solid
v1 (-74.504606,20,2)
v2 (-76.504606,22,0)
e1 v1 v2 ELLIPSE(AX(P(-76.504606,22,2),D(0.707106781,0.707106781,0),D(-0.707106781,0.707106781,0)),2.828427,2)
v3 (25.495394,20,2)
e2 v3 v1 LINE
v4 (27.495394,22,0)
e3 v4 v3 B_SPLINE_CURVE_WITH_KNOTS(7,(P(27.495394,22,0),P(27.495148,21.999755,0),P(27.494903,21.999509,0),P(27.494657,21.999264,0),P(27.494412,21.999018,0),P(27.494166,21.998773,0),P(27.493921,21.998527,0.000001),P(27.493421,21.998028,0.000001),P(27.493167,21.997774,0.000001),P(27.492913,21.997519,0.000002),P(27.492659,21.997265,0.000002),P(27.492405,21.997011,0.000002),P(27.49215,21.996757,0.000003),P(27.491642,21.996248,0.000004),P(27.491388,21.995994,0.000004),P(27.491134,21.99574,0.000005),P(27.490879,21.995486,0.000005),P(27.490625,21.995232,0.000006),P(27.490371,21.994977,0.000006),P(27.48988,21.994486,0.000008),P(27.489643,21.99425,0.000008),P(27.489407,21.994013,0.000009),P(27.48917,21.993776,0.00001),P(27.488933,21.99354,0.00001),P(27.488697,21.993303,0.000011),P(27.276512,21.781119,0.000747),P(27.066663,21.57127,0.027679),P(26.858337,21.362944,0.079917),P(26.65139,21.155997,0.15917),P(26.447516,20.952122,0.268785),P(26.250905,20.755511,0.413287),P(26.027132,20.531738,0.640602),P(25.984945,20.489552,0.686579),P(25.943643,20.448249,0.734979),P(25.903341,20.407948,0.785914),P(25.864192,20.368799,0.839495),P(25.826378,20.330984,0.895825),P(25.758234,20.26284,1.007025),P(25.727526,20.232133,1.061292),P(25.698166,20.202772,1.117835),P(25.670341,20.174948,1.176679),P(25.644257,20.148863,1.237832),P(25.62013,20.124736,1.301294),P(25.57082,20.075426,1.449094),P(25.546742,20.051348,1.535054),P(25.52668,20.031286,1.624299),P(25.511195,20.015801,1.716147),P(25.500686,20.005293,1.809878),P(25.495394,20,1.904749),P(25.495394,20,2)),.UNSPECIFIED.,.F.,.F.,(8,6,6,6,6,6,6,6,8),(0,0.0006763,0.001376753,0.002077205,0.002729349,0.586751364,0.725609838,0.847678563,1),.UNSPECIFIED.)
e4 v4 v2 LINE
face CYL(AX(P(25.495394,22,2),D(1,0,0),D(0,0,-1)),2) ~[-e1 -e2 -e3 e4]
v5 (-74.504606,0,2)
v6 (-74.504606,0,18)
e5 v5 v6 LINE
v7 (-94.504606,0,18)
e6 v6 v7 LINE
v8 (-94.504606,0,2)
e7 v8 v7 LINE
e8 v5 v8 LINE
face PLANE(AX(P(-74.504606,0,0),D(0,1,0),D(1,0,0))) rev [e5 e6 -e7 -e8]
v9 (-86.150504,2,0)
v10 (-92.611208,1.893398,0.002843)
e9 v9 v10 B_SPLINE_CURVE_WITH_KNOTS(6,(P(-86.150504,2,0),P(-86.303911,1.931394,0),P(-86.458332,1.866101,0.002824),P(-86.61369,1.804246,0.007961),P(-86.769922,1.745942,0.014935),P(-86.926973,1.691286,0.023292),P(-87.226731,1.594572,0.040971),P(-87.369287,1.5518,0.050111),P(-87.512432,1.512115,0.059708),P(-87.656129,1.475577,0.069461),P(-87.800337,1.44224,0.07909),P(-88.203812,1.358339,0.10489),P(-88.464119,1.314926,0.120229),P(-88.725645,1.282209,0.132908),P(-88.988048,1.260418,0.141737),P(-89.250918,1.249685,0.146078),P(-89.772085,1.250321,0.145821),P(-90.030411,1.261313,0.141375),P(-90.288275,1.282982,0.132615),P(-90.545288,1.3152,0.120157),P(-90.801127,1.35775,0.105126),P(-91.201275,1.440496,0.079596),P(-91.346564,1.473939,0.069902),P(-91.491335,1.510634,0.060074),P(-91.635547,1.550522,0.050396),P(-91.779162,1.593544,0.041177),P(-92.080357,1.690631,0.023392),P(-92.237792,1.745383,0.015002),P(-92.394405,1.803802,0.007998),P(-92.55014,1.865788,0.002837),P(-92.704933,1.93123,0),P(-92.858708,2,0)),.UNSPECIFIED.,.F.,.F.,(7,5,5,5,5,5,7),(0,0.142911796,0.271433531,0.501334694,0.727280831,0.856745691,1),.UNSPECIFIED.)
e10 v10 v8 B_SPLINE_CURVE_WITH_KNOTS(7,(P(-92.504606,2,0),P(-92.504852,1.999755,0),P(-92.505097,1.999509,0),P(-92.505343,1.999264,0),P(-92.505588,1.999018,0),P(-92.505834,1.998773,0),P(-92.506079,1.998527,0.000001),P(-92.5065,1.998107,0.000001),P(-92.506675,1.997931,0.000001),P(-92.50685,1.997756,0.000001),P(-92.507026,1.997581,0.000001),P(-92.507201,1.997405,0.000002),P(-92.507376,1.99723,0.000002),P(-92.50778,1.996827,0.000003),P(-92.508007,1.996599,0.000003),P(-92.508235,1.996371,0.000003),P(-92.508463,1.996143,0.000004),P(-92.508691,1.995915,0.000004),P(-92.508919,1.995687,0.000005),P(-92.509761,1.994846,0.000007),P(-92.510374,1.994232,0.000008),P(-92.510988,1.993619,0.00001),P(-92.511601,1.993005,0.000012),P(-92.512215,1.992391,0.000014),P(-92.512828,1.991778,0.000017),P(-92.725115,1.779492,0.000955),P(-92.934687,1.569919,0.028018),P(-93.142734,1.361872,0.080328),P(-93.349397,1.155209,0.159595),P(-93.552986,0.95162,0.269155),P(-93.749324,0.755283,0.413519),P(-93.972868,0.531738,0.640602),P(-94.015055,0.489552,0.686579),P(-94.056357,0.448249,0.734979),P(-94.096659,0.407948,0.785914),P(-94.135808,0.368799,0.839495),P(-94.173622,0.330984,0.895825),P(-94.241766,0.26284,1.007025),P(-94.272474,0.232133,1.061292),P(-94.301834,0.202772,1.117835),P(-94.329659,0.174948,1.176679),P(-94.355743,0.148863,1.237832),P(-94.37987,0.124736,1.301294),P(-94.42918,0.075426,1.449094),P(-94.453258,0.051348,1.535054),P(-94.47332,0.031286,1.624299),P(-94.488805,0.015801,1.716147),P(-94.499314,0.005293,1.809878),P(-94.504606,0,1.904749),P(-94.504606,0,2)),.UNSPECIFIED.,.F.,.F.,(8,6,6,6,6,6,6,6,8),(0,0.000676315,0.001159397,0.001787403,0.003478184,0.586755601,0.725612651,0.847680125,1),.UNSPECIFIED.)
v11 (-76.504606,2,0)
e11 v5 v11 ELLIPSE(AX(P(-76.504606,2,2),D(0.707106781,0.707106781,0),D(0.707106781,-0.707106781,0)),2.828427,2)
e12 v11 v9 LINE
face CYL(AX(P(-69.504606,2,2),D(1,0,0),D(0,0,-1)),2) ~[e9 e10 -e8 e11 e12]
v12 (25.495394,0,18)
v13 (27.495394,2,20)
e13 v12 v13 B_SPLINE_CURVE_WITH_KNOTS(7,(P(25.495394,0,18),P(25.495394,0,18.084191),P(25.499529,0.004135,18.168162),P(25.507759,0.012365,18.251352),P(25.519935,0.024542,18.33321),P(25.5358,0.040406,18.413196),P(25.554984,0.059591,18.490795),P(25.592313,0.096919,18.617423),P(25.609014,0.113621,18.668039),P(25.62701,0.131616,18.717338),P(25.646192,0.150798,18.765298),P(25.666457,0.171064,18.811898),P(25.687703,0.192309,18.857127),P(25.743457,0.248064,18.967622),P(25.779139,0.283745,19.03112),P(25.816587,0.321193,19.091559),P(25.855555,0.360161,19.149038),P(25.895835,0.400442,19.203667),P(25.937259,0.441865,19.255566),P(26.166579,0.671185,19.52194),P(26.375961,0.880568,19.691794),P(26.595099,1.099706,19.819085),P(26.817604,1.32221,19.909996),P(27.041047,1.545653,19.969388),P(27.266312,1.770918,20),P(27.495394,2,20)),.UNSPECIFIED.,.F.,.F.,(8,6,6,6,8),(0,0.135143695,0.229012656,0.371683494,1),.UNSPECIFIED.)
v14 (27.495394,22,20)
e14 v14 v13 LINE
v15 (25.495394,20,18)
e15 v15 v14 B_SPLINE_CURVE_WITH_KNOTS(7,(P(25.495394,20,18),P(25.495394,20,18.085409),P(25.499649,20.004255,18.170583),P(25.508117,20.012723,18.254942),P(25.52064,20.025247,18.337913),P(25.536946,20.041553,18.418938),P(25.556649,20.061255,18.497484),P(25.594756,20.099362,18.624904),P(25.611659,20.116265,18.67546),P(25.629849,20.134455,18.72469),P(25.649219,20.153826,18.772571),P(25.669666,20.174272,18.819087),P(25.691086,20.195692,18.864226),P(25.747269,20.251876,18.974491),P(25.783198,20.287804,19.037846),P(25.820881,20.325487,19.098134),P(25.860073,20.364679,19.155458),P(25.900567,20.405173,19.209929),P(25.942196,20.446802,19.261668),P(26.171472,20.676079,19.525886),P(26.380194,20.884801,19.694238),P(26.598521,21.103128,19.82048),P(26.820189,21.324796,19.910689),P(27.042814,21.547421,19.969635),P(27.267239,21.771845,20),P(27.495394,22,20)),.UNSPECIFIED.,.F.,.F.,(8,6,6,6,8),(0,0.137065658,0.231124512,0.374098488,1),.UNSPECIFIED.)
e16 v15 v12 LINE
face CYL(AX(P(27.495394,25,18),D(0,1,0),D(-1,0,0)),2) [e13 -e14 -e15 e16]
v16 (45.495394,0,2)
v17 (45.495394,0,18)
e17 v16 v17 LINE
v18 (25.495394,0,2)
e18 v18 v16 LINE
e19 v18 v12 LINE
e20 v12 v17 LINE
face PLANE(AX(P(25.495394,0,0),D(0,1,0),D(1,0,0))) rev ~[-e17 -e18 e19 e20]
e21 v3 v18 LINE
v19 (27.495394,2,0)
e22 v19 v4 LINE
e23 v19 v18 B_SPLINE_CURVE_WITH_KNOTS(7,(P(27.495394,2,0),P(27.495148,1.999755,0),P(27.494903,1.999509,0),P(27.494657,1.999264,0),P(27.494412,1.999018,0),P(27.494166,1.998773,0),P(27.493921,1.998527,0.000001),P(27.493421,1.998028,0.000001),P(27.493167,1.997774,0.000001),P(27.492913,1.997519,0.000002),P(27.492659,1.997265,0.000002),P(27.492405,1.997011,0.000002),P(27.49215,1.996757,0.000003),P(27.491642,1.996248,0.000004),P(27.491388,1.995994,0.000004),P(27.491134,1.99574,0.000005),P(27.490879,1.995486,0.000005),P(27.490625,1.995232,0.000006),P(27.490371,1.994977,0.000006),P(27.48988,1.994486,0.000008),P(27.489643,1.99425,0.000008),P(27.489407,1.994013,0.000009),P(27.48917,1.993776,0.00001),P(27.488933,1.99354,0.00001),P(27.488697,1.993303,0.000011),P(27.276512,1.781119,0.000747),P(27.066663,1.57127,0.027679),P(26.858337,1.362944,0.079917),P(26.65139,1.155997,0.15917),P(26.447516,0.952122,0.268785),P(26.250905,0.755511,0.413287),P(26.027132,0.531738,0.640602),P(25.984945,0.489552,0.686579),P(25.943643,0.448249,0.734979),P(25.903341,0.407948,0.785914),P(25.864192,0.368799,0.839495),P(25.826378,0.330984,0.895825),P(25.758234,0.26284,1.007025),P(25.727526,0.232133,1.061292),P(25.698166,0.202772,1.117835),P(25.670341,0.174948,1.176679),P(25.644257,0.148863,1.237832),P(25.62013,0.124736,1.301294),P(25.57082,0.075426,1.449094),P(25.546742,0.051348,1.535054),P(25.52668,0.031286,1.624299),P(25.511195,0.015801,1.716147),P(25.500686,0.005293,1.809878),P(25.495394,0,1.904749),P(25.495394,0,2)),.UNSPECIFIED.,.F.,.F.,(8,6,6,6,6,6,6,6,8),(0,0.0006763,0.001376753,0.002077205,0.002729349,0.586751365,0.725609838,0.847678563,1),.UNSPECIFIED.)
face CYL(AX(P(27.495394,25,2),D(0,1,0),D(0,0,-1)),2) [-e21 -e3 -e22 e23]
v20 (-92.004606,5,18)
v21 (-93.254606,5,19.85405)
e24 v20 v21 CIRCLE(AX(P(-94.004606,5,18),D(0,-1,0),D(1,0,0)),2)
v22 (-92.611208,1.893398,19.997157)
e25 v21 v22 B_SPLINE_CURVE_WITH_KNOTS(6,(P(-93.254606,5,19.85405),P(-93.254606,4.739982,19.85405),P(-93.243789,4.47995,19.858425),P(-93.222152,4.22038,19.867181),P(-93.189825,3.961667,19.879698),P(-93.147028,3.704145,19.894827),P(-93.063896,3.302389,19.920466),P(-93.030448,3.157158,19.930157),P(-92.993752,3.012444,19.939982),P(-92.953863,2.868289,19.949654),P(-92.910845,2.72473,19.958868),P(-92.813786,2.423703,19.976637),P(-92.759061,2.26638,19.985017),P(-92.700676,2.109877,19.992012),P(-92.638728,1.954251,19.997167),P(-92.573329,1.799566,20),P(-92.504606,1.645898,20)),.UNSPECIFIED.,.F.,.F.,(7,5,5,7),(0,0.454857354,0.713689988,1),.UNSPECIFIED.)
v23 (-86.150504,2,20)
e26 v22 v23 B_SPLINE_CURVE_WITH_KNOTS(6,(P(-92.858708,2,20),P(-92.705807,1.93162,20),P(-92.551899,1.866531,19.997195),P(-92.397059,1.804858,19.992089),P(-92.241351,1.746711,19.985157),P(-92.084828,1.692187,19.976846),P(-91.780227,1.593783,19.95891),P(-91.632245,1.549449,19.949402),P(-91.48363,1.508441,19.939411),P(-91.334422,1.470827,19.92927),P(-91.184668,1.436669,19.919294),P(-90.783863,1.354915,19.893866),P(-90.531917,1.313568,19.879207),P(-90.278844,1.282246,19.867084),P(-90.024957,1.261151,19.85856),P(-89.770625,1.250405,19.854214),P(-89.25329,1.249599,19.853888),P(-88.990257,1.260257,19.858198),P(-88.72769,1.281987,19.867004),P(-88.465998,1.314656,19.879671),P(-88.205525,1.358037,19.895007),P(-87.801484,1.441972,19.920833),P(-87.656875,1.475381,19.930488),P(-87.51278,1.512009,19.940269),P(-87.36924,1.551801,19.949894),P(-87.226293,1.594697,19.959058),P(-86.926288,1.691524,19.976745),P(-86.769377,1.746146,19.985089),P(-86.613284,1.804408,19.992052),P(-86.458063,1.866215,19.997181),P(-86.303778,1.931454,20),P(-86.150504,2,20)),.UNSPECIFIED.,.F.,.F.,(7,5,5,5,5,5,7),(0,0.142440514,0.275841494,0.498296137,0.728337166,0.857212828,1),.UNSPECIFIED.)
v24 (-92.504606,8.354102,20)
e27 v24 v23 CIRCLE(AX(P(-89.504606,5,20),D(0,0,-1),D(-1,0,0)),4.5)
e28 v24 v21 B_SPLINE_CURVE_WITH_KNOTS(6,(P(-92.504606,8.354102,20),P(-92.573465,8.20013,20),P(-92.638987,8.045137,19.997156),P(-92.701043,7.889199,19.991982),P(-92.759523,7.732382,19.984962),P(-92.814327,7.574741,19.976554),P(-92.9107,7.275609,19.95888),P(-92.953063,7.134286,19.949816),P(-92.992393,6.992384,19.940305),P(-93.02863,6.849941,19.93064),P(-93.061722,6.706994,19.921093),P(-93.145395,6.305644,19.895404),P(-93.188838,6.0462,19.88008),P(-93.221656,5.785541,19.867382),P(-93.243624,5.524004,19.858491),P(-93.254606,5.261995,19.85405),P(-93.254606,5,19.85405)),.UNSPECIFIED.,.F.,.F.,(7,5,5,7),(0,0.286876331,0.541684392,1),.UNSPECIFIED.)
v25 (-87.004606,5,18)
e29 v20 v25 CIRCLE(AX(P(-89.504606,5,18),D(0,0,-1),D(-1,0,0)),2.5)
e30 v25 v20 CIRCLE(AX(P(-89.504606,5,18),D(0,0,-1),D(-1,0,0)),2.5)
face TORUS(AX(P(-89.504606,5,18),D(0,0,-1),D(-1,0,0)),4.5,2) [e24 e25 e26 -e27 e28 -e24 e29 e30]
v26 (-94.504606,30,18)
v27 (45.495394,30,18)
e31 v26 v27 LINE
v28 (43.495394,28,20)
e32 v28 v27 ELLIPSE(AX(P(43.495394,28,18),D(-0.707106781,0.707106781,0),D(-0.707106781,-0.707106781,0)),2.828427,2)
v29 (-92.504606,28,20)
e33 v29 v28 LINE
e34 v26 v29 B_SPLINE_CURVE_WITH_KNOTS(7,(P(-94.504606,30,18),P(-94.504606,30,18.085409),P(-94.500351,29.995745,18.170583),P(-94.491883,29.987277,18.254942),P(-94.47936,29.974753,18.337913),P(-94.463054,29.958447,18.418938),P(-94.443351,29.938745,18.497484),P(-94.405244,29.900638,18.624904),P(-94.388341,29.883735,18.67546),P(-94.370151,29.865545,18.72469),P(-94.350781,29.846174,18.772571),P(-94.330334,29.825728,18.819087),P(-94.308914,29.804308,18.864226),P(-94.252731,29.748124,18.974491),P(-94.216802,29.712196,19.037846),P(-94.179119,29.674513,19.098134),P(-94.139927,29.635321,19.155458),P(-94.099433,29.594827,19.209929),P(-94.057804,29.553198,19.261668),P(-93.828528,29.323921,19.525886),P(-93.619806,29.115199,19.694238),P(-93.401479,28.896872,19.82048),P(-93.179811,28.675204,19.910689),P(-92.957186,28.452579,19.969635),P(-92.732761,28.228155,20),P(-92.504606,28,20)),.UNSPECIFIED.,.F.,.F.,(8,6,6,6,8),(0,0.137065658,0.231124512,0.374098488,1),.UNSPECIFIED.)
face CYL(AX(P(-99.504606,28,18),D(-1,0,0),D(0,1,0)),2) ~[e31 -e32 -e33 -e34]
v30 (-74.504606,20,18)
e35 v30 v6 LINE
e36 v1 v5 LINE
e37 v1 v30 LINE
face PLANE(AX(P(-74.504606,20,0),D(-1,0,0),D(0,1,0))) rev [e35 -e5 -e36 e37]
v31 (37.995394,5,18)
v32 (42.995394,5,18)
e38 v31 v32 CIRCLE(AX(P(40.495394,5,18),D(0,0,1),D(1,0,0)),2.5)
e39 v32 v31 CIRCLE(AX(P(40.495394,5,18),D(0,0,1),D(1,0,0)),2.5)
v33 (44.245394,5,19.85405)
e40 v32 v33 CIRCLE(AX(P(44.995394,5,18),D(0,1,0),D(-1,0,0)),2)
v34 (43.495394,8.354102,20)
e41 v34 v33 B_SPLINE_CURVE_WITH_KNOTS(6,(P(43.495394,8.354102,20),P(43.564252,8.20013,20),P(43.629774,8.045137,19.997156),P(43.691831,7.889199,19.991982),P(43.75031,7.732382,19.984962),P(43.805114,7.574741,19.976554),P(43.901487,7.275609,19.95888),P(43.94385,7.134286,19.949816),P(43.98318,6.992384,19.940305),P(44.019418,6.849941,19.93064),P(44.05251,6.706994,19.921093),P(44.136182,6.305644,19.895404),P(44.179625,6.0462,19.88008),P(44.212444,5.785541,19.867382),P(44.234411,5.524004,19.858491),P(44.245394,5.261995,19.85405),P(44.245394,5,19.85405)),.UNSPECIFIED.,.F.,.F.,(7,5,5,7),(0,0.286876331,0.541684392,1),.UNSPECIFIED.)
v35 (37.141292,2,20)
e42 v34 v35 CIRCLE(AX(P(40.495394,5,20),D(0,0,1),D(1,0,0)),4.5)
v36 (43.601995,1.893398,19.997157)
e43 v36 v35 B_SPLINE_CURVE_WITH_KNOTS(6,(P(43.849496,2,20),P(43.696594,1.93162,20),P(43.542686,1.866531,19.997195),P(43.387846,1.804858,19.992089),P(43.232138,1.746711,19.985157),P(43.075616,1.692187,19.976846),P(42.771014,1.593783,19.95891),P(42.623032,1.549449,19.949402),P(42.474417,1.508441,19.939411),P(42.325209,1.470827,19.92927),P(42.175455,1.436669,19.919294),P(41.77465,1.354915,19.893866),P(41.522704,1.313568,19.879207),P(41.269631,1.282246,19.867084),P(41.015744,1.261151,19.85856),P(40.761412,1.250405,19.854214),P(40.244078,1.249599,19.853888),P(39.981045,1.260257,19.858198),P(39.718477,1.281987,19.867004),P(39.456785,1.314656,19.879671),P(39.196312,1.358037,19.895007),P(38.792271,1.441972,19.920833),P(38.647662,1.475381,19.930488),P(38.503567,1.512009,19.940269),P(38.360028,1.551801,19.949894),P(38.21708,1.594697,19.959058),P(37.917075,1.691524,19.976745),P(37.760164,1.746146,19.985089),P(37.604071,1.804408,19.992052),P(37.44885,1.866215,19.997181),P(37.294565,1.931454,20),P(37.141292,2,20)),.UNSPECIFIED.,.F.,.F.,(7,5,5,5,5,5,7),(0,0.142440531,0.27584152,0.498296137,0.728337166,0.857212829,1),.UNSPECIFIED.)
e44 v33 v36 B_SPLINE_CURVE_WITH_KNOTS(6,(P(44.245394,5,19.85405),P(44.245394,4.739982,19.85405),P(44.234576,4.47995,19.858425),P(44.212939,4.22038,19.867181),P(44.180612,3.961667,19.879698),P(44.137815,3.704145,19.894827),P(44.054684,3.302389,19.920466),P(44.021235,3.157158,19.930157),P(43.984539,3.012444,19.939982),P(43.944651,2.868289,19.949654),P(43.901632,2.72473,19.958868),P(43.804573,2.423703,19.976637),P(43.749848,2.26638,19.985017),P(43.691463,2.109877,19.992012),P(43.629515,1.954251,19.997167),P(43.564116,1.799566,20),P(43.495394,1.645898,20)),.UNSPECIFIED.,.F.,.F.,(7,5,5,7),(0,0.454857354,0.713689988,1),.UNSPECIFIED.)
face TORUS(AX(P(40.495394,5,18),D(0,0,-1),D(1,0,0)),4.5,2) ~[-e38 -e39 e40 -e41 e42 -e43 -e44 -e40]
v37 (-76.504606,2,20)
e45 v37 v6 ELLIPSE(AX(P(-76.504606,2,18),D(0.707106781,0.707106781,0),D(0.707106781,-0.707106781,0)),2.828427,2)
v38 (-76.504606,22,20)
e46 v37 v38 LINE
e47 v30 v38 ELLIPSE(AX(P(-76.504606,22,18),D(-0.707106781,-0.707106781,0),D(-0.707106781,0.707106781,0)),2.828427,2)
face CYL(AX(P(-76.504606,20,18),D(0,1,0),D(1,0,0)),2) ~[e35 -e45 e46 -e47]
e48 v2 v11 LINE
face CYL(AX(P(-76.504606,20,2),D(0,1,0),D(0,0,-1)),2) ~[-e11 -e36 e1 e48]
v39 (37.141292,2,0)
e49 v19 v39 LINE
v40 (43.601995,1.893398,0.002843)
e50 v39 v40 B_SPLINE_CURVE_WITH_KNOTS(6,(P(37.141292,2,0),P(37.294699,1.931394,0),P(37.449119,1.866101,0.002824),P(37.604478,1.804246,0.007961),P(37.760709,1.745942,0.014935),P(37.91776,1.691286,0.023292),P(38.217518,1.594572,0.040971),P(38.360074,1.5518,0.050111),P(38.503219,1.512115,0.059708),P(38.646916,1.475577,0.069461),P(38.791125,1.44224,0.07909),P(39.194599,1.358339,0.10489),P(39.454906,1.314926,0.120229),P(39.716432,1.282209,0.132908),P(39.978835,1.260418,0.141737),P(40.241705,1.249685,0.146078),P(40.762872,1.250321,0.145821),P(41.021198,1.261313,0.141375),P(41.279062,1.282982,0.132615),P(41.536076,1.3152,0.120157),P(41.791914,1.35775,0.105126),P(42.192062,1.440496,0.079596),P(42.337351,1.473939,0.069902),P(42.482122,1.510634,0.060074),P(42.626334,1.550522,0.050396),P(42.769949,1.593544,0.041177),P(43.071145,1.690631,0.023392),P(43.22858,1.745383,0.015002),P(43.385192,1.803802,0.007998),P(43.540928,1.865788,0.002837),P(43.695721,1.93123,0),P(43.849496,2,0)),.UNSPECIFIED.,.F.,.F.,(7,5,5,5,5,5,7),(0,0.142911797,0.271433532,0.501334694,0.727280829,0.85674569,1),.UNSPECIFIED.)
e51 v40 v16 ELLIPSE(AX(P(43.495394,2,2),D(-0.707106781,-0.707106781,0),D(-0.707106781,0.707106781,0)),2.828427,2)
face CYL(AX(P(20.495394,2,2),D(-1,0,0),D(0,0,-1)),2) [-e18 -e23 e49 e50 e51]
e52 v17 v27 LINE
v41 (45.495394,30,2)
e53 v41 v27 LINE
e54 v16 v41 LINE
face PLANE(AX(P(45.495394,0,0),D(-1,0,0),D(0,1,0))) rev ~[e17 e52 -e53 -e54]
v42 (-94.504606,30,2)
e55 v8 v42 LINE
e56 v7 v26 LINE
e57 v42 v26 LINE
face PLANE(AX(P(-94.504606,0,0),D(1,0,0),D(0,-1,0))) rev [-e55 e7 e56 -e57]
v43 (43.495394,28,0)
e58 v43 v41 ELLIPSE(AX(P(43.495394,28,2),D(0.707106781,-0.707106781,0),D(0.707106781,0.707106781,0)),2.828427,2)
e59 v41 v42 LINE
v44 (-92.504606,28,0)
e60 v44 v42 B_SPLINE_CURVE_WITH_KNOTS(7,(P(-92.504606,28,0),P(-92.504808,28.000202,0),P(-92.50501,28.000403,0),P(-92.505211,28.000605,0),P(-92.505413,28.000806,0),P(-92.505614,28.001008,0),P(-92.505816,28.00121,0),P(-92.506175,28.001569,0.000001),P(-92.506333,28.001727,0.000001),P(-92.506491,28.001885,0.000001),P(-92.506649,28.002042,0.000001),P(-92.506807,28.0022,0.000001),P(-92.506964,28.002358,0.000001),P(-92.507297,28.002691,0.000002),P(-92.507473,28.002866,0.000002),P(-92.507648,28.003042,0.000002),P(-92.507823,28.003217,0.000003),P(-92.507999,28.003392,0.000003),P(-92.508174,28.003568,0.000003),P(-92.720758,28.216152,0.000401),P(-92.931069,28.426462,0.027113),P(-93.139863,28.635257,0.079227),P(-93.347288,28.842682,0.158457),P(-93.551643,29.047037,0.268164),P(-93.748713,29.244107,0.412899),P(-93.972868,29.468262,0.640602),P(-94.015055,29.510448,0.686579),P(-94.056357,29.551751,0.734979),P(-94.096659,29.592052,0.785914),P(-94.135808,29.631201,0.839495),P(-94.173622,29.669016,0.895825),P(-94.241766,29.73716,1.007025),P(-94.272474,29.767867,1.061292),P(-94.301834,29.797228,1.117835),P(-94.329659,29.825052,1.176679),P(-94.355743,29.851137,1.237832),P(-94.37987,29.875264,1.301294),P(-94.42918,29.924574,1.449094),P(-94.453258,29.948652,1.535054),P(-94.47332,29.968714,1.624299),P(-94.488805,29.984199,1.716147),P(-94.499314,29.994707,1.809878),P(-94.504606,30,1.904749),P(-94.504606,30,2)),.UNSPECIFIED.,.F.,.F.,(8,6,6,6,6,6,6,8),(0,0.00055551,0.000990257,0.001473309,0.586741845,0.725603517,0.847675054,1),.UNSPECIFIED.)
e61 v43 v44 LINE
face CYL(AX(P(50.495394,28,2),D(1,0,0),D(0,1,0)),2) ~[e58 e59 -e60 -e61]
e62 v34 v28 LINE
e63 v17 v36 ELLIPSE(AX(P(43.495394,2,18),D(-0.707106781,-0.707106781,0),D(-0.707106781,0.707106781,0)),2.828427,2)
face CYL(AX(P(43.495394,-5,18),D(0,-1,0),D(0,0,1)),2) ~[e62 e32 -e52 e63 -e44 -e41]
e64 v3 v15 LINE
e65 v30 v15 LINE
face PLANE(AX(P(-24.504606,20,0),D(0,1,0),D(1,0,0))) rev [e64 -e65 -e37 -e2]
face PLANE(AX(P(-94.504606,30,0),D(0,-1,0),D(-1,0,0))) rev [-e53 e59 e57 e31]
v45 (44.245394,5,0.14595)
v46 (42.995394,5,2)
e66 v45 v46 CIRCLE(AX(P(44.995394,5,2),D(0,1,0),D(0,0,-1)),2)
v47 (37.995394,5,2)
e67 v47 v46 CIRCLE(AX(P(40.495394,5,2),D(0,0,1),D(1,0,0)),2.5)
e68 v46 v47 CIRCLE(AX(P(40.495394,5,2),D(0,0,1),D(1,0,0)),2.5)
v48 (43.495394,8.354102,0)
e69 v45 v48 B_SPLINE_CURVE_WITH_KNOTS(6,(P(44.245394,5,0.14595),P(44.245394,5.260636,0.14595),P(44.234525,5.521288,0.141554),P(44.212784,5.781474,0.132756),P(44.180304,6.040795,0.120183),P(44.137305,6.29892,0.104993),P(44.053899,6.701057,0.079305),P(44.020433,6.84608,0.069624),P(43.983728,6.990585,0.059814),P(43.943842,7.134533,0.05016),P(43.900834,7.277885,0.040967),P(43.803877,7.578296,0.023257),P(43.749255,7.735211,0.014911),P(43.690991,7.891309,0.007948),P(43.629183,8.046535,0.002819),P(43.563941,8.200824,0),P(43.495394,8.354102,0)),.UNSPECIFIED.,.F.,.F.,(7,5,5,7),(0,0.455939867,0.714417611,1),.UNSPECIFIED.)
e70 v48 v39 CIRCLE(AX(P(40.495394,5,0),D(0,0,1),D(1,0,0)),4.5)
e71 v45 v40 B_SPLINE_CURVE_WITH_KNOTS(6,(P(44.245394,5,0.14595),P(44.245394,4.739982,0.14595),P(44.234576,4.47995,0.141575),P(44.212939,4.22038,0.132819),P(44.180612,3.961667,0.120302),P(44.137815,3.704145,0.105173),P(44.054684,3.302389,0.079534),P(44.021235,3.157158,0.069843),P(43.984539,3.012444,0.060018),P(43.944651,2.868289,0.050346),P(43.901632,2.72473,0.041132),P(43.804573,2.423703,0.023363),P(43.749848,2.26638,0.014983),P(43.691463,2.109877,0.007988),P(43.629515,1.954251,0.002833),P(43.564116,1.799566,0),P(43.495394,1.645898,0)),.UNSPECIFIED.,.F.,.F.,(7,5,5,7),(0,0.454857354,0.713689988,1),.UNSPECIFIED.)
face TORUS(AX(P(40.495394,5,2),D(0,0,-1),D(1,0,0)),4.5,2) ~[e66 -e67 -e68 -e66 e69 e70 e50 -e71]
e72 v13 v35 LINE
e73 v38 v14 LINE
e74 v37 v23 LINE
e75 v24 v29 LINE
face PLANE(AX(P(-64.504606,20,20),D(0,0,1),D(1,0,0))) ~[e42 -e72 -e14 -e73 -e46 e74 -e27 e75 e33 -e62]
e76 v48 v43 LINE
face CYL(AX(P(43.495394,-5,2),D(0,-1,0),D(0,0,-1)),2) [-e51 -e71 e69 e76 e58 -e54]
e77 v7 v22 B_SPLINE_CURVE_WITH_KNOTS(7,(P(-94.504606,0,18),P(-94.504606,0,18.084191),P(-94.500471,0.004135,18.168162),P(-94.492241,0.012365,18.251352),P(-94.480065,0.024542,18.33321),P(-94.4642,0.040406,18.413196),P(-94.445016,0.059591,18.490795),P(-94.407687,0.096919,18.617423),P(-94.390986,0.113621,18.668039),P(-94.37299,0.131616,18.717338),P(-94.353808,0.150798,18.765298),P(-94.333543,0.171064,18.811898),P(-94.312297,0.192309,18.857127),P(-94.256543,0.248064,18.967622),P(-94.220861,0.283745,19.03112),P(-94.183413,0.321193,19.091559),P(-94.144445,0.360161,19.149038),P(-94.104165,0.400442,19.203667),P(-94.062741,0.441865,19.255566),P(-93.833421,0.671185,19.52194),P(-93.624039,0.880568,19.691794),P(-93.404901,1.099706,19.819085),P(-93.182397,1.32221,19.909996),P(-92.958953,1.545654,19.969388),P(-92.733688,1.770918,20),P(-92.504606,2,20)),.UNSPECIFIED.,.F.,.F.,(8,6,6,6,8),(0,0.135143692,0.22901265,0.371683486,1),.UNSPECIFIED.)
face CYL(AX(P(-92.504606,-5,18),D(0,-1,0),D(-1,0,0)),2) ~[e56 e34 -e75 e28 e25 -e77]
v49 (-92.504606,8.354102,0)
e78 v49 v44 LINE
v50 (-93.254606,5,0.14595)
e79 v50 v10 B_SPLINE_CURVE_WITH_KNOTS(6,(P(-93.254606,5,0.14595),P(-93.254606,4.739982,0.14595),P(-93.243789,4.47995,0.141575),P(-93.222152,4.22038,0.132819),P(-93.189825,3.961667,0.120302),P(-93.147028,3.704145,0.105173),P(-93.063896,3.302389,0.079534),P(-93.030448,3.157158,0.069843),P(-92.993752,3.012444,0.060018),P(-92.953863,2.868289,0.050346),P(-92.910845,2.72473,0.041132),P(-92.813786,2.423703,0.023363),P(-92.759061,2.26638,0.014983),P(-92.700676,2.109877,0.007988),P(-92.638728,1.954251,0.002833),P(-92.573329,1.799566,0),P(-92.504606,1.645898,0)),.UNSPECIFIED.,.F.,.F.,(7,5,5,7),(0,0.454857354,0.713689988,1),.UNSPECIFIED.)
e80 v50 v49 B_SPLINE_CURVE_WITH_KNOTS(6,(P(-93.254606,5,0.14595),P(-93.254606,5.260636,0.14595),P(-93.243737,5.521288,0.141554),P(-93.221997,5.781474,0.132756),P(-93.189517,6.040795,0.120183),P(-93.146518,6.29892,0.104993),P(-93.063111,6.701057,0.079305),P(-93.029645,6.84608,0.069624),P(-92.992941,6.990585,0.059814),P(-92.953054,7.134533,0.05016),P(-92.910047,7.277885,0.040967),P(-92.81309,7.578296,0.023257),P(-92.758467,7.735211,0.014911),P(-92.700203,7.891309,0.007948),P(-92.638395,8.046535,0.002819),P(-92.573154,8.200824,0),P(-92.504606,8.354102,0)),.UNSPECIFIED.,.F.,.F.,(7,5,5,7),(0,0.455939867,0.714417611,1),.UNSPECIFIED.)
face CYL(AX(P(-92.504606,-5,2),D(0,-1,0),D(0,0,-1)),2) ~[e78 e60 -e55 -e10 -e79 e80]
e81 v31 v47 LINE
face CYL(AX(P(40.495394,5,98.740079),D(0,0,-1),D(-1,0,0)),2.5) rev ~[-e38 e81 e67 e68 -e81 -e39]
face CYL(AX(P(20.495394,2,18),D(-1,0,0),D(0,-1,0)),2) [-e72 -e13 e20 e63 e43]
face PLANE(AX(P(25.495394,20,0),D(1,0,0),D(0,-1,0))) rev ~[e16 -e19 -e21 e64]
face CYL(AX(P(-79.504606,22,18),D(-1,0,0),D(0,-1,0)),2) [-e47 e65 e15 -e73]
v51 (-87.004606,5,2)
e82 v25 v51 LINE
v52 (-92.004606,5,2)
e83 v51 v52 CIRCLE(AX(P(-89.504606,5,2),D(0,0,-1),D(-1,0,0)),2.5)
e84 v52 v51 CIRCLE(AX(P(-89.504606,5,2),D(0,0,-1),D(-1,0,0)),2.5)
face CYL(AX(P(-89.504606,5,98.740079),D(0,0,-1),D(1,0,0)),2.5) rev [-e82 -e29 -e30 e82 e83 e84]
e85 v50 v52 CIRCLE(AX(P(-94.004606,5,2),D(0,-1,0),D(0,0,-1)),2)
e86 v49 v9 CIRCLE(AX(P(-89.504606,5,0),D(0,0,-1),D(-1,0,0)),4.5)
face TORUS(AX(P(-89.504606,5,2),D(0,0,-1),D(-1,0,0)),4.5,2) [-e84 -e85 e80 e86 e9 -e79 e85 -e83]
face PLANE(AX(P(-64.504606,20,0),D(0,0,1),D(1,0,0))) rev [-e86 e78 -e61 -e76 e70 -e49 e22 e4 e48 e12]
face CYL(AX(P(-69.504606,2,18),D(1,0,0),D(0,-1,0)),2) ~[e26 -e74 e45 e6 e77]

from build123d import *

# Parameters (mm, degrees)
F1_DEPTH     = 20
F3_D         = 5
F5_T3_DEPTH  = 150
F5_T6_DEPTH  = 40
F5_T9_DEPTH  = 30
F5_T12_DEPTH = 25
F5_T15_DEPTH = 100
F5_T18_DEPTH = 25
F5_T21_DEPTH = 30
F5_T24_DEPTH = 40
F5_T33_DEPTH = 150
F5_T36_DEPTH = 40
F5_T39_DEPTH = 30
F5_T42_DEPTH = 25
F5_T45_DEPTH = 100
F5_T48_DEPTH = 25
F5_T51_DEPTH = 30
F5_T54_DEPTH = 40
F5_T64_DEPTH = 105
F5_T68_DEPTH = 30
F5_T74_DEPTH = 30
F5_T78_DEPTH = 105
F5_T84_DEPTH = 30
F5_T88_DEPTH = 105
F5_T94_DEPTH = 105
F5_T98_DEPTH = 30


# Not quite as in the source:
# - a fillet or chamfer that OpenCascade refuses, or shapes differently, is made with other operations: its cross-section is extruded or revolved along the edge and cut away or added


with BuildPart() as f1:
    # F0 (on Top) → F1 (new body)
    with BuildSketch(Plane.XY):
        Polygon((45.4953936456, 30), (-24.5046063544, 30), (-24.5046063544, 20), (25.4953936456, 20), (25.4953936456, 0), (45.4953936456, 0), align=None)
    extrude(amount=F1_DEPTH)

    # F3 (through all)
    with Locations(Plane.XY.offset(20)):
        with Locations((40.4953936456, 5)):
            Hole(F3_D / 2)

    # F4: F1 across face


with BuildPart() as f1_1:
    add(f1.part)
    add(f1.part.mirror(Plane(origin=(-24.5046063544, 25, 10), x_dir=(0, -1, 0), z_dir=(-1, 0, 0))))

    # F5: fillet of radius 2 on 20 edges, made by hand


with BuildPart() as f5_tool1:
    # F5_s2 → F5_t3 (new body)
    with BuildSketch(Plane.YZ.offset(-99.5046063544)):
        with BuildLine():
            ThreePointArc((30, 18), (29.4142135624, 19.4142135624), (28, 20))
            Line((28, 20), (30, 20))
            Line((30, 20), (30, 18))
        make_face()
    extrude(amount=F5_T3_DEPTH)


with BuildPart() as f5_tool4:
    # F5_s5 → F5_t6 (new body)
    with BuildSketch(Plane.XZ.offset(5)):
        with BuildLine():
            ThreePointArc((-94.5046063544, 18), (-93.9188199167, 19.4142135624), (-92.5046063544, 20))
            Line((-92.5046063544, 20), (-94.5046063544, 20))
            Line((-94.5046063544, 20), (-94.5046063544, 18))
        make_face()
    extrude(amount=-F5_T6_DEPTH)


with BuildPart() as f5_tool7:
    # F5_s8 → F5_t9 (new body)
    with BuildSketch(Plane.YZ.offset(-69.5046063544)):
        with BuildLine():
            ThreePointArc((0, 18), (0.5857864376, 19.4142135624), (2, 20))
            Line((2, 20), (0, 20))
            Line((0, 20), (0, 18))
        make_face()
    extrude(amount=-F5_T9_DEPTH)


with BuildPart() as f5_tool10:
    # F5_s11 → F5_t12 (new body)
    with BuildSketch(Plane.XZ.offset(-20)):
        with BuildLine():
            ThreePointArc((-74.5046063544, 18), (-75.090392792, 19.4142135624), (-76.5046063544, 20))
            Line((-76.5046063544, 20), (-74.5046063544, 20))
            Line((-74.5046063544, 20), (-74.5046063544, 18))
        make_face()
    extrude(amount=F5_T12_DEPTH)


with BuildPart() as f5_tool13:
    # F5_s14 → F5_t15 (new body)
    with BuildSketch(Plane.YZ.offset(-74.5046063544)):
        with BuildLine():
            ThreePointArc((20, 18), (20.5857864376, 19.4142135624), (22, 20))
            Line((22, 20), (20, 20))
            Line((20, 20), (20, 18))
        make_face()
    extrude(amount=F5_T15_DEPTH)


with BuildPart() as f5_tool16:
    # F5_s17 → F5_t18 (new body)
    with BuildSketch(Plane.XZ.offset(-20)):
        with BuildLine():
            ThreePointArc((25.4953936456, 18), (26.0811800833, 19.4142135624), (27.4953936456, 20))
            Line((27.4953936456, 20), (25.4953936456, 20))
            Line((25.4953936456, 20), (25.4953936456, 18))
        make_face()
    extrude(amount=F5_T18_DEPTH)


with BuildPart() as f5_tool19:
    # F5_s20 → F5_t21 (new body)
    with BuildSketch(Plane.YZ.offset(20.4953936456)):
        with BuildLine():
            ThreePointArc((0, 18), (0.5857864376, 19.4142135624), (2, 20))
            Line((2, 20), (0, 20))
            Line((0, 20), (0, 18))
        make_face()
    extrude(amount=F5_T21_DEPTH)


with BuildPart() as f5_tool22:
    # F5_s23 → F5_t24 (new body)
    with BuildSketch(Plane.XZ.offset(5)):
        with BuildLine():
            ThreePointArc((43.4953936456, 20), (44.909607208, 19.4142135624), (45.4953936456, 18))
            Line((45.4953936456, 18), (45.4953936456, 20))
            Line((45.4953936456, 20), (43.4953936456, 20))
        make_face()
    extrude(amount=-F5_T24_DEPTH)


with BuildPart() as f5_tool25:
    # F5_s26 → F5_t27 (revolve)
    with BuildSketch(Plane.XZ.offset(-5)):
        with BuildLine():
            ThreePointArc((42.9953936456, 18), (43.5811800833, 19.4142135624), (44.9953936456, 20))
            Line((44.9953936456, 20), (42.9953936456, 20))
            Line((42.9953936456, 20), (42.9953936456, 18))
        make_face()
    revolve(axis=Axis((40.4953936456, 5, 20), (0, 0, 1)))


with BuildPart() as f5_tool28:
    # F5_s29 → F5_t30 (revolve)
    with BuildSketch(Plane.XZ.offset(-5)):
        with BuildLine():
            ThreePointArc((-92.0046063544, 18), (-92.590392792, 19.4142135624), (-94.0046063544, 20))
            Line((-94.0046063544, 20), (-92.0046063544, 20))
            Line((-92.0046063544, 20), (-92.0046063544, 18))
        make_face()
    revolve(axis=Axis((-89.5046063544, 5, 20), (0, 0, -1)))


with BuildPart() as f5_tool31:
    # F5_s32 → F5_t33 (new body)
    with BuildSketch(Plane.YZ.offset(50.4953936456)):
        with BuildLine():
            ThreePointArc((30, 2), (29.4142135624, 0.5857864376), (28, 0))
            Line((28, 0), (30, 0))
            Line((30, 0), (30, 2))
        make_face()
    extrude(amount=-F5_T33_DEPTH)


with BuildPart() as f5_tool34:
    # F5_s35 → F5_t36 (new body)
    with BuildSketch(Plane.XZ.offset(5)):
        with BuildLine():
            ThreePointArc((-92.5046063544, 0), (-93.9188199167, 0.5857864376), (-94.5046063544, 2))
            Line((-94.5046063544, 2), (-94.5046063544, 0))
            Line((-94.5046063544, 0), (-92.5046063544, 0))
        make_face()
    extrude(amount=-F5_T36_DEPTH)


with BuildPart() as f5_tool37:
    # F5_s38 → F5_t39 (new body)
    with BuildSketch(Plane.YZ.offset(-69.5046063544)):
        with BuildLine():
            ThreePointArc((2, 0), (0.5857864376, 0.5857864376), (0, 2))
            Line((0, 2), (0, 0))
            Line((0, 0), (2, 0))
        make_face()
    extrude(amount=-F5_T39_DEPTH)


with BuildPart() as f5_tool40:
    # F5_s41 → F5_t42 (new body)
    with BuildSketch(Plane.XZ.offset(-20)):
        with BuildLine():
            ThreePointArc((-76.5046063544, 0), (-75.090392792, 0.5857864376), (-74.5046063544, 2))
            Line((-74.5046063544, 2), (-74.5046063544, 0))
            Line((-74.5046063544, 0), (-76.5046063544, 0))
        make_face()
    extrude(amount=F5_T42_DEPTH)


with BuildPart() as f5_tool43:
    # F5_s44 → F5_t45 (new body)
    with BuildSketch(Plane.YZ.offset(25.4953936456)):
        with BuildLine():
            ThreePointArc((22, 0), (20.5857864376, 0.5857864376), (20, 2))
            Line((20, 2), (20, 0))
            Line((20, 0), (22, 0))
        make_face()
    extrude(amount=-F5_T45_DEPTH)


with BuildPart() as f5_tool46:
    # F5_s47 → F5_t48 (new body)
    with BuildSketch(Plane.XZ.offset(-20)):
        with BuildLine():
            ThreePointArc((27.4953936456, 0), (26.0811800833, 0.5857864376), (25.4953936456, 2))
            Line((25.4953936456, 2), (25.4953936456, 0))
            Line((25.4953936456, 0), (27.4953936456, 0))
        make_face()
    extrude(amount=F5_T48_DEPTH)


with BuildPart() as f5_tool49:
    # F5_s50 → F5_t51 (new body)
    with BuildSketch(Plane.YZ.offset(20.4953936456)):
        with BuildLine():
            ThreePointArc((2, 0), (0.5857864376, 0.5857864376), (0, 2))
            Line((0, 2), (0, 0))
            Line((0, 0), (2, 0))
        make_face()
    extrude(amount=F5_T51_DEPTH)


with BuildPart() as f5_tool52:
    # F5_s53 → F5_t54 (new body)
    with BuildSketch(Plane.XZ.offset(5)):
        with BuildLine():
            ThreePointArc((43.4953936456, 0), (44.909607208, 0.5857864376), (45.4953936456, 2))
            Line((45.4953936456, 2), (45.4953936456, 0))
            Line((45.4953936456, 0), (43.4953936456, 0))
        make_face()
    extrude(amount=-F5_T54_DEPTH)


with BuildPart() as f5_tool55:
    # F5_s56 → F5_t57 (revolve)
    with BuildSketch(Plane.XZ.offset(-5)):
        with BuildLine():
            ThreePointArc((44.9953936456, 0), (43.5811800833, 0.5857864376), (42.9953936456, 2))
            Line((42.9953936456, 2), (42.9953936456, 0))
            Line((42.9953936456, 0), (44.9953936456, 0))
        make_face()
    revolve(axis=Axis((40.4953936456, 5, 0), (0, 0, 1)))


with BuildPart() as f5_tool58:
    # F5_s59 → F5_t60 (revolve)
    with BuildSketch(Plane.XZ.offset(-5)):
        with BuildLine():
            ThreePointArc((-94.0046063544, 0), (-92.590392792, 0.5857864376), (-92.0046063544, 2))
            Line((-92.0046063544, 2), (-92.0046063544, 0))
            Line((-92.0046063544, 0), (-94.0046063544, 0))
        make_face()
    revolve(axis=Axis((-89.5046063544, 5, 0), (0, 0, -1)))


with BuildPart() as f5_tool62:
    # F5_s63 → F5_t64 (new body)
    with BuildSketch(Plane.YZ.offset(-79.5046063544)):
        with BuildLine():
            ThreePointArc((20, 18), (20.5857864376, 19.4142135624), (22, 20))
            Line((22, 20), (20, 20))
            Line((20, 20), (20, 18))
        make_face()
    extrude(amount=F5_T64_DEPTH)

    split(bisect_by=Plane.YZ.offset(-74.5046063544), keep=Keep.BOTTOM)


with BuildPart() as f5_tool66:
    # F5_s67 → F5_t68 (new body)
    with BuildSketch(Plane.XZ.offset(-25)):
        with BuildLine():
            ThreePointArc((-74.5046063544, 18), (-75.090392792, 19.4142135624), (-76.5046063544, 20))
            Line((-76.5046063544, 20), (-74.5046063544, 20))
            Line((-74.5046063544, 20), (-74.5046063544, 18))
        make_face()
    extrude(amount=F5_T68_DEPTH)

    split(bisect_by=Plane.XZ.offset(-20), keep=Keep.BOTTOM)


with BuildPart() as f5_tool62_1:
    add(f5_tool62.part)

    # F5_t70: intersect F5_tool66
    add(f5_tool66.part, mode=Mode.INTERSECT)


with BuildPart() as f5_tool72:
    # F5_s73 → F5_t74 (new body)
    with BuildSketch(Plane.XZ.offset(-25)):
        with BuildLine():
            ThreePointArc((25.4953936456, 18), (26.0811800833, 19.4142135624), (27.4953936456, 20))
            Line((27.4953936456, 20), (25.4953936456, 20))
            Line((25.4953936456, 20), (25.4953936456, 18))
        make_face()
    extrude(amount=F5_T74_DEPTH)

    split(bisect_by=Plane.XZ.offset(-20), keep=Keep.BOTTOM)


with BuildPart() as f5_tool76:
    # F5_s77 → F5_t78 (new body)
    with BuildSketch(Plane.YZ.offset(-74.5046063544)):
        with BuildLine():
            ThreePointArc((20, 18), (20.5857864376, 19.4142135624), (22, 20))
            Line((22, 20), (20, 20))
            Line((20, 20), (20, 18))
        make_face()
    extrude(amount=F5_T78_DEPTH)

    split(bisect_by=Plane.YZ.offset(25.4953936456), keep=Keep.TOP)


with BuildPart() as f5_tool72_1:
    add(f5_tool72.part)

    # F5_t80: intersect F5_tool76
    add(f5_tool76.part, mode=Mode.INTERSECT)


with BuildPart() as f5_tool82:
    # F5_s83 → F5_t84 (new body)
    with BuildSketch(Plane.XZ.offset(-25)):
        with BuildLine():
            ThreePointArc((-76.5046063544, 0), (-75.090392792, 0.5857864376), (-74.5046063544, 2))
            Line((-74.5046063544, 2), (-74.5046063544, 0))
            Line((-74.5046063544, 0), (-76.5046063544, 0))
        make_face()
    extrude(amount=F5_T84_DEPTH)

    split(bisect_by=Plane.XZ.offset(-20), keep=Keep.BOTTOM)


with BuildPart() as f5_tool86:
    # F5_s87 → F5_t88 (new body)
    with BuildSketch(Plane.YZ.offset(25.4953936456)):
        with BuildLine():
            ThreePointArc((22, 0), (20.5857864376, 0.5857864376), (20, 2))
            Line((20, 2), (20, 0))
            Line((20, 0), (22, 0))
        make_face()
    extrude(amount=-F5_T88_DEPTH)

    split(bisect_by=Plane.YZ.offset(-74.5046063544), keep=Keep.BOTTOM)


with BuildPart() as f5_tool82_1:
    add(f5_tool82.part)

    # F5_t90: intersect F5_tool86
    add(f5_tool86.part, mode=Mode.INTERSECT)


with BuildPart() as f5_tool92:
    # F5_s93 → F5_t94 (new body)
    with BuildSketch(Plane.YZ.offset(30.4953936456)):
        with BuildLine():
            ThreePointArc((22, 0), (20.5857864376, 0.5857864376), (20, 2))
            Line((20, 2), (20, 0))
            Line((20, 0), (22, 0))
        make_face()
    extrude(amount=-F5_T94_DEPTH)

    split(bisect_by=Plane.YZ.offset(25.4953936456), keep=Keep.TOP)


with BuildPart() as f5_tool96:
    # F5_s97 → F5_t98 (new body)
    with BuildSketch(Plane.XZ.offset(-25)):
        with BuildLine():
            ThreePointArc((27.4953936456, 0), (26.0811800833, 0.5857864376), (25.4953936456, 2))
            Line((25.4953936456, 2), (25.4953936456, 0))
            Line((25.4953936456, 0), (27.4953936456, 0))
        make_face()
    extrude(amount=F5_T98_DEPTH)

    split(bisect_by=Plane.XZ.offset(-20), keep=Keep.BOTTOM)


with BuildPart() as f5_tool92_1:
    add(f5_tool92.part)

    # F5_t100: intersect F5_tool96
    add(f5_tool96.part, mode=Mode.INTERSECT)


with BuildPart() as f1_2:
    add(f1_1.part)

    # F5_t101: cut F5_tool1, F5_tool4, F5_tool7, F5_tool10, F5_tool13, F5_tool16, F5_tool19, F5_tool22, F5_tool25, F5_tool28, F5_tool31, F5_tool34, F5_tool37, F5_tool40, F5_tool43, F5_tool46, F5_tool49, F5_tool52, F5_tool55, F5_tool58, F5_tool62, F5_tool72, F5_tool82, F5_tool92
    add([f5_tool1.part, f5_tool4.part, f5_tool7.part, f5_tool10.part, f5_tool13.part, f5_tool16.part, f5_tool19.part, f5_tool22.part, f5_tool25.part, f5_tool28.part, f5_tool31.part, f5_tool34.part, f5_tool37.part, f5_tool40.part, f5_tool43.part, f5_tool46.part, f5_tool49.part, f5_tool52.part, f5_tool55.part, f5_tool58.part, f5_tool62_1.part, f5_tool72_1.part, f5_tool82_1.part, f5_tool92_1.part], mode=Mode.SUBTRACT)


solid = f1_2.part
